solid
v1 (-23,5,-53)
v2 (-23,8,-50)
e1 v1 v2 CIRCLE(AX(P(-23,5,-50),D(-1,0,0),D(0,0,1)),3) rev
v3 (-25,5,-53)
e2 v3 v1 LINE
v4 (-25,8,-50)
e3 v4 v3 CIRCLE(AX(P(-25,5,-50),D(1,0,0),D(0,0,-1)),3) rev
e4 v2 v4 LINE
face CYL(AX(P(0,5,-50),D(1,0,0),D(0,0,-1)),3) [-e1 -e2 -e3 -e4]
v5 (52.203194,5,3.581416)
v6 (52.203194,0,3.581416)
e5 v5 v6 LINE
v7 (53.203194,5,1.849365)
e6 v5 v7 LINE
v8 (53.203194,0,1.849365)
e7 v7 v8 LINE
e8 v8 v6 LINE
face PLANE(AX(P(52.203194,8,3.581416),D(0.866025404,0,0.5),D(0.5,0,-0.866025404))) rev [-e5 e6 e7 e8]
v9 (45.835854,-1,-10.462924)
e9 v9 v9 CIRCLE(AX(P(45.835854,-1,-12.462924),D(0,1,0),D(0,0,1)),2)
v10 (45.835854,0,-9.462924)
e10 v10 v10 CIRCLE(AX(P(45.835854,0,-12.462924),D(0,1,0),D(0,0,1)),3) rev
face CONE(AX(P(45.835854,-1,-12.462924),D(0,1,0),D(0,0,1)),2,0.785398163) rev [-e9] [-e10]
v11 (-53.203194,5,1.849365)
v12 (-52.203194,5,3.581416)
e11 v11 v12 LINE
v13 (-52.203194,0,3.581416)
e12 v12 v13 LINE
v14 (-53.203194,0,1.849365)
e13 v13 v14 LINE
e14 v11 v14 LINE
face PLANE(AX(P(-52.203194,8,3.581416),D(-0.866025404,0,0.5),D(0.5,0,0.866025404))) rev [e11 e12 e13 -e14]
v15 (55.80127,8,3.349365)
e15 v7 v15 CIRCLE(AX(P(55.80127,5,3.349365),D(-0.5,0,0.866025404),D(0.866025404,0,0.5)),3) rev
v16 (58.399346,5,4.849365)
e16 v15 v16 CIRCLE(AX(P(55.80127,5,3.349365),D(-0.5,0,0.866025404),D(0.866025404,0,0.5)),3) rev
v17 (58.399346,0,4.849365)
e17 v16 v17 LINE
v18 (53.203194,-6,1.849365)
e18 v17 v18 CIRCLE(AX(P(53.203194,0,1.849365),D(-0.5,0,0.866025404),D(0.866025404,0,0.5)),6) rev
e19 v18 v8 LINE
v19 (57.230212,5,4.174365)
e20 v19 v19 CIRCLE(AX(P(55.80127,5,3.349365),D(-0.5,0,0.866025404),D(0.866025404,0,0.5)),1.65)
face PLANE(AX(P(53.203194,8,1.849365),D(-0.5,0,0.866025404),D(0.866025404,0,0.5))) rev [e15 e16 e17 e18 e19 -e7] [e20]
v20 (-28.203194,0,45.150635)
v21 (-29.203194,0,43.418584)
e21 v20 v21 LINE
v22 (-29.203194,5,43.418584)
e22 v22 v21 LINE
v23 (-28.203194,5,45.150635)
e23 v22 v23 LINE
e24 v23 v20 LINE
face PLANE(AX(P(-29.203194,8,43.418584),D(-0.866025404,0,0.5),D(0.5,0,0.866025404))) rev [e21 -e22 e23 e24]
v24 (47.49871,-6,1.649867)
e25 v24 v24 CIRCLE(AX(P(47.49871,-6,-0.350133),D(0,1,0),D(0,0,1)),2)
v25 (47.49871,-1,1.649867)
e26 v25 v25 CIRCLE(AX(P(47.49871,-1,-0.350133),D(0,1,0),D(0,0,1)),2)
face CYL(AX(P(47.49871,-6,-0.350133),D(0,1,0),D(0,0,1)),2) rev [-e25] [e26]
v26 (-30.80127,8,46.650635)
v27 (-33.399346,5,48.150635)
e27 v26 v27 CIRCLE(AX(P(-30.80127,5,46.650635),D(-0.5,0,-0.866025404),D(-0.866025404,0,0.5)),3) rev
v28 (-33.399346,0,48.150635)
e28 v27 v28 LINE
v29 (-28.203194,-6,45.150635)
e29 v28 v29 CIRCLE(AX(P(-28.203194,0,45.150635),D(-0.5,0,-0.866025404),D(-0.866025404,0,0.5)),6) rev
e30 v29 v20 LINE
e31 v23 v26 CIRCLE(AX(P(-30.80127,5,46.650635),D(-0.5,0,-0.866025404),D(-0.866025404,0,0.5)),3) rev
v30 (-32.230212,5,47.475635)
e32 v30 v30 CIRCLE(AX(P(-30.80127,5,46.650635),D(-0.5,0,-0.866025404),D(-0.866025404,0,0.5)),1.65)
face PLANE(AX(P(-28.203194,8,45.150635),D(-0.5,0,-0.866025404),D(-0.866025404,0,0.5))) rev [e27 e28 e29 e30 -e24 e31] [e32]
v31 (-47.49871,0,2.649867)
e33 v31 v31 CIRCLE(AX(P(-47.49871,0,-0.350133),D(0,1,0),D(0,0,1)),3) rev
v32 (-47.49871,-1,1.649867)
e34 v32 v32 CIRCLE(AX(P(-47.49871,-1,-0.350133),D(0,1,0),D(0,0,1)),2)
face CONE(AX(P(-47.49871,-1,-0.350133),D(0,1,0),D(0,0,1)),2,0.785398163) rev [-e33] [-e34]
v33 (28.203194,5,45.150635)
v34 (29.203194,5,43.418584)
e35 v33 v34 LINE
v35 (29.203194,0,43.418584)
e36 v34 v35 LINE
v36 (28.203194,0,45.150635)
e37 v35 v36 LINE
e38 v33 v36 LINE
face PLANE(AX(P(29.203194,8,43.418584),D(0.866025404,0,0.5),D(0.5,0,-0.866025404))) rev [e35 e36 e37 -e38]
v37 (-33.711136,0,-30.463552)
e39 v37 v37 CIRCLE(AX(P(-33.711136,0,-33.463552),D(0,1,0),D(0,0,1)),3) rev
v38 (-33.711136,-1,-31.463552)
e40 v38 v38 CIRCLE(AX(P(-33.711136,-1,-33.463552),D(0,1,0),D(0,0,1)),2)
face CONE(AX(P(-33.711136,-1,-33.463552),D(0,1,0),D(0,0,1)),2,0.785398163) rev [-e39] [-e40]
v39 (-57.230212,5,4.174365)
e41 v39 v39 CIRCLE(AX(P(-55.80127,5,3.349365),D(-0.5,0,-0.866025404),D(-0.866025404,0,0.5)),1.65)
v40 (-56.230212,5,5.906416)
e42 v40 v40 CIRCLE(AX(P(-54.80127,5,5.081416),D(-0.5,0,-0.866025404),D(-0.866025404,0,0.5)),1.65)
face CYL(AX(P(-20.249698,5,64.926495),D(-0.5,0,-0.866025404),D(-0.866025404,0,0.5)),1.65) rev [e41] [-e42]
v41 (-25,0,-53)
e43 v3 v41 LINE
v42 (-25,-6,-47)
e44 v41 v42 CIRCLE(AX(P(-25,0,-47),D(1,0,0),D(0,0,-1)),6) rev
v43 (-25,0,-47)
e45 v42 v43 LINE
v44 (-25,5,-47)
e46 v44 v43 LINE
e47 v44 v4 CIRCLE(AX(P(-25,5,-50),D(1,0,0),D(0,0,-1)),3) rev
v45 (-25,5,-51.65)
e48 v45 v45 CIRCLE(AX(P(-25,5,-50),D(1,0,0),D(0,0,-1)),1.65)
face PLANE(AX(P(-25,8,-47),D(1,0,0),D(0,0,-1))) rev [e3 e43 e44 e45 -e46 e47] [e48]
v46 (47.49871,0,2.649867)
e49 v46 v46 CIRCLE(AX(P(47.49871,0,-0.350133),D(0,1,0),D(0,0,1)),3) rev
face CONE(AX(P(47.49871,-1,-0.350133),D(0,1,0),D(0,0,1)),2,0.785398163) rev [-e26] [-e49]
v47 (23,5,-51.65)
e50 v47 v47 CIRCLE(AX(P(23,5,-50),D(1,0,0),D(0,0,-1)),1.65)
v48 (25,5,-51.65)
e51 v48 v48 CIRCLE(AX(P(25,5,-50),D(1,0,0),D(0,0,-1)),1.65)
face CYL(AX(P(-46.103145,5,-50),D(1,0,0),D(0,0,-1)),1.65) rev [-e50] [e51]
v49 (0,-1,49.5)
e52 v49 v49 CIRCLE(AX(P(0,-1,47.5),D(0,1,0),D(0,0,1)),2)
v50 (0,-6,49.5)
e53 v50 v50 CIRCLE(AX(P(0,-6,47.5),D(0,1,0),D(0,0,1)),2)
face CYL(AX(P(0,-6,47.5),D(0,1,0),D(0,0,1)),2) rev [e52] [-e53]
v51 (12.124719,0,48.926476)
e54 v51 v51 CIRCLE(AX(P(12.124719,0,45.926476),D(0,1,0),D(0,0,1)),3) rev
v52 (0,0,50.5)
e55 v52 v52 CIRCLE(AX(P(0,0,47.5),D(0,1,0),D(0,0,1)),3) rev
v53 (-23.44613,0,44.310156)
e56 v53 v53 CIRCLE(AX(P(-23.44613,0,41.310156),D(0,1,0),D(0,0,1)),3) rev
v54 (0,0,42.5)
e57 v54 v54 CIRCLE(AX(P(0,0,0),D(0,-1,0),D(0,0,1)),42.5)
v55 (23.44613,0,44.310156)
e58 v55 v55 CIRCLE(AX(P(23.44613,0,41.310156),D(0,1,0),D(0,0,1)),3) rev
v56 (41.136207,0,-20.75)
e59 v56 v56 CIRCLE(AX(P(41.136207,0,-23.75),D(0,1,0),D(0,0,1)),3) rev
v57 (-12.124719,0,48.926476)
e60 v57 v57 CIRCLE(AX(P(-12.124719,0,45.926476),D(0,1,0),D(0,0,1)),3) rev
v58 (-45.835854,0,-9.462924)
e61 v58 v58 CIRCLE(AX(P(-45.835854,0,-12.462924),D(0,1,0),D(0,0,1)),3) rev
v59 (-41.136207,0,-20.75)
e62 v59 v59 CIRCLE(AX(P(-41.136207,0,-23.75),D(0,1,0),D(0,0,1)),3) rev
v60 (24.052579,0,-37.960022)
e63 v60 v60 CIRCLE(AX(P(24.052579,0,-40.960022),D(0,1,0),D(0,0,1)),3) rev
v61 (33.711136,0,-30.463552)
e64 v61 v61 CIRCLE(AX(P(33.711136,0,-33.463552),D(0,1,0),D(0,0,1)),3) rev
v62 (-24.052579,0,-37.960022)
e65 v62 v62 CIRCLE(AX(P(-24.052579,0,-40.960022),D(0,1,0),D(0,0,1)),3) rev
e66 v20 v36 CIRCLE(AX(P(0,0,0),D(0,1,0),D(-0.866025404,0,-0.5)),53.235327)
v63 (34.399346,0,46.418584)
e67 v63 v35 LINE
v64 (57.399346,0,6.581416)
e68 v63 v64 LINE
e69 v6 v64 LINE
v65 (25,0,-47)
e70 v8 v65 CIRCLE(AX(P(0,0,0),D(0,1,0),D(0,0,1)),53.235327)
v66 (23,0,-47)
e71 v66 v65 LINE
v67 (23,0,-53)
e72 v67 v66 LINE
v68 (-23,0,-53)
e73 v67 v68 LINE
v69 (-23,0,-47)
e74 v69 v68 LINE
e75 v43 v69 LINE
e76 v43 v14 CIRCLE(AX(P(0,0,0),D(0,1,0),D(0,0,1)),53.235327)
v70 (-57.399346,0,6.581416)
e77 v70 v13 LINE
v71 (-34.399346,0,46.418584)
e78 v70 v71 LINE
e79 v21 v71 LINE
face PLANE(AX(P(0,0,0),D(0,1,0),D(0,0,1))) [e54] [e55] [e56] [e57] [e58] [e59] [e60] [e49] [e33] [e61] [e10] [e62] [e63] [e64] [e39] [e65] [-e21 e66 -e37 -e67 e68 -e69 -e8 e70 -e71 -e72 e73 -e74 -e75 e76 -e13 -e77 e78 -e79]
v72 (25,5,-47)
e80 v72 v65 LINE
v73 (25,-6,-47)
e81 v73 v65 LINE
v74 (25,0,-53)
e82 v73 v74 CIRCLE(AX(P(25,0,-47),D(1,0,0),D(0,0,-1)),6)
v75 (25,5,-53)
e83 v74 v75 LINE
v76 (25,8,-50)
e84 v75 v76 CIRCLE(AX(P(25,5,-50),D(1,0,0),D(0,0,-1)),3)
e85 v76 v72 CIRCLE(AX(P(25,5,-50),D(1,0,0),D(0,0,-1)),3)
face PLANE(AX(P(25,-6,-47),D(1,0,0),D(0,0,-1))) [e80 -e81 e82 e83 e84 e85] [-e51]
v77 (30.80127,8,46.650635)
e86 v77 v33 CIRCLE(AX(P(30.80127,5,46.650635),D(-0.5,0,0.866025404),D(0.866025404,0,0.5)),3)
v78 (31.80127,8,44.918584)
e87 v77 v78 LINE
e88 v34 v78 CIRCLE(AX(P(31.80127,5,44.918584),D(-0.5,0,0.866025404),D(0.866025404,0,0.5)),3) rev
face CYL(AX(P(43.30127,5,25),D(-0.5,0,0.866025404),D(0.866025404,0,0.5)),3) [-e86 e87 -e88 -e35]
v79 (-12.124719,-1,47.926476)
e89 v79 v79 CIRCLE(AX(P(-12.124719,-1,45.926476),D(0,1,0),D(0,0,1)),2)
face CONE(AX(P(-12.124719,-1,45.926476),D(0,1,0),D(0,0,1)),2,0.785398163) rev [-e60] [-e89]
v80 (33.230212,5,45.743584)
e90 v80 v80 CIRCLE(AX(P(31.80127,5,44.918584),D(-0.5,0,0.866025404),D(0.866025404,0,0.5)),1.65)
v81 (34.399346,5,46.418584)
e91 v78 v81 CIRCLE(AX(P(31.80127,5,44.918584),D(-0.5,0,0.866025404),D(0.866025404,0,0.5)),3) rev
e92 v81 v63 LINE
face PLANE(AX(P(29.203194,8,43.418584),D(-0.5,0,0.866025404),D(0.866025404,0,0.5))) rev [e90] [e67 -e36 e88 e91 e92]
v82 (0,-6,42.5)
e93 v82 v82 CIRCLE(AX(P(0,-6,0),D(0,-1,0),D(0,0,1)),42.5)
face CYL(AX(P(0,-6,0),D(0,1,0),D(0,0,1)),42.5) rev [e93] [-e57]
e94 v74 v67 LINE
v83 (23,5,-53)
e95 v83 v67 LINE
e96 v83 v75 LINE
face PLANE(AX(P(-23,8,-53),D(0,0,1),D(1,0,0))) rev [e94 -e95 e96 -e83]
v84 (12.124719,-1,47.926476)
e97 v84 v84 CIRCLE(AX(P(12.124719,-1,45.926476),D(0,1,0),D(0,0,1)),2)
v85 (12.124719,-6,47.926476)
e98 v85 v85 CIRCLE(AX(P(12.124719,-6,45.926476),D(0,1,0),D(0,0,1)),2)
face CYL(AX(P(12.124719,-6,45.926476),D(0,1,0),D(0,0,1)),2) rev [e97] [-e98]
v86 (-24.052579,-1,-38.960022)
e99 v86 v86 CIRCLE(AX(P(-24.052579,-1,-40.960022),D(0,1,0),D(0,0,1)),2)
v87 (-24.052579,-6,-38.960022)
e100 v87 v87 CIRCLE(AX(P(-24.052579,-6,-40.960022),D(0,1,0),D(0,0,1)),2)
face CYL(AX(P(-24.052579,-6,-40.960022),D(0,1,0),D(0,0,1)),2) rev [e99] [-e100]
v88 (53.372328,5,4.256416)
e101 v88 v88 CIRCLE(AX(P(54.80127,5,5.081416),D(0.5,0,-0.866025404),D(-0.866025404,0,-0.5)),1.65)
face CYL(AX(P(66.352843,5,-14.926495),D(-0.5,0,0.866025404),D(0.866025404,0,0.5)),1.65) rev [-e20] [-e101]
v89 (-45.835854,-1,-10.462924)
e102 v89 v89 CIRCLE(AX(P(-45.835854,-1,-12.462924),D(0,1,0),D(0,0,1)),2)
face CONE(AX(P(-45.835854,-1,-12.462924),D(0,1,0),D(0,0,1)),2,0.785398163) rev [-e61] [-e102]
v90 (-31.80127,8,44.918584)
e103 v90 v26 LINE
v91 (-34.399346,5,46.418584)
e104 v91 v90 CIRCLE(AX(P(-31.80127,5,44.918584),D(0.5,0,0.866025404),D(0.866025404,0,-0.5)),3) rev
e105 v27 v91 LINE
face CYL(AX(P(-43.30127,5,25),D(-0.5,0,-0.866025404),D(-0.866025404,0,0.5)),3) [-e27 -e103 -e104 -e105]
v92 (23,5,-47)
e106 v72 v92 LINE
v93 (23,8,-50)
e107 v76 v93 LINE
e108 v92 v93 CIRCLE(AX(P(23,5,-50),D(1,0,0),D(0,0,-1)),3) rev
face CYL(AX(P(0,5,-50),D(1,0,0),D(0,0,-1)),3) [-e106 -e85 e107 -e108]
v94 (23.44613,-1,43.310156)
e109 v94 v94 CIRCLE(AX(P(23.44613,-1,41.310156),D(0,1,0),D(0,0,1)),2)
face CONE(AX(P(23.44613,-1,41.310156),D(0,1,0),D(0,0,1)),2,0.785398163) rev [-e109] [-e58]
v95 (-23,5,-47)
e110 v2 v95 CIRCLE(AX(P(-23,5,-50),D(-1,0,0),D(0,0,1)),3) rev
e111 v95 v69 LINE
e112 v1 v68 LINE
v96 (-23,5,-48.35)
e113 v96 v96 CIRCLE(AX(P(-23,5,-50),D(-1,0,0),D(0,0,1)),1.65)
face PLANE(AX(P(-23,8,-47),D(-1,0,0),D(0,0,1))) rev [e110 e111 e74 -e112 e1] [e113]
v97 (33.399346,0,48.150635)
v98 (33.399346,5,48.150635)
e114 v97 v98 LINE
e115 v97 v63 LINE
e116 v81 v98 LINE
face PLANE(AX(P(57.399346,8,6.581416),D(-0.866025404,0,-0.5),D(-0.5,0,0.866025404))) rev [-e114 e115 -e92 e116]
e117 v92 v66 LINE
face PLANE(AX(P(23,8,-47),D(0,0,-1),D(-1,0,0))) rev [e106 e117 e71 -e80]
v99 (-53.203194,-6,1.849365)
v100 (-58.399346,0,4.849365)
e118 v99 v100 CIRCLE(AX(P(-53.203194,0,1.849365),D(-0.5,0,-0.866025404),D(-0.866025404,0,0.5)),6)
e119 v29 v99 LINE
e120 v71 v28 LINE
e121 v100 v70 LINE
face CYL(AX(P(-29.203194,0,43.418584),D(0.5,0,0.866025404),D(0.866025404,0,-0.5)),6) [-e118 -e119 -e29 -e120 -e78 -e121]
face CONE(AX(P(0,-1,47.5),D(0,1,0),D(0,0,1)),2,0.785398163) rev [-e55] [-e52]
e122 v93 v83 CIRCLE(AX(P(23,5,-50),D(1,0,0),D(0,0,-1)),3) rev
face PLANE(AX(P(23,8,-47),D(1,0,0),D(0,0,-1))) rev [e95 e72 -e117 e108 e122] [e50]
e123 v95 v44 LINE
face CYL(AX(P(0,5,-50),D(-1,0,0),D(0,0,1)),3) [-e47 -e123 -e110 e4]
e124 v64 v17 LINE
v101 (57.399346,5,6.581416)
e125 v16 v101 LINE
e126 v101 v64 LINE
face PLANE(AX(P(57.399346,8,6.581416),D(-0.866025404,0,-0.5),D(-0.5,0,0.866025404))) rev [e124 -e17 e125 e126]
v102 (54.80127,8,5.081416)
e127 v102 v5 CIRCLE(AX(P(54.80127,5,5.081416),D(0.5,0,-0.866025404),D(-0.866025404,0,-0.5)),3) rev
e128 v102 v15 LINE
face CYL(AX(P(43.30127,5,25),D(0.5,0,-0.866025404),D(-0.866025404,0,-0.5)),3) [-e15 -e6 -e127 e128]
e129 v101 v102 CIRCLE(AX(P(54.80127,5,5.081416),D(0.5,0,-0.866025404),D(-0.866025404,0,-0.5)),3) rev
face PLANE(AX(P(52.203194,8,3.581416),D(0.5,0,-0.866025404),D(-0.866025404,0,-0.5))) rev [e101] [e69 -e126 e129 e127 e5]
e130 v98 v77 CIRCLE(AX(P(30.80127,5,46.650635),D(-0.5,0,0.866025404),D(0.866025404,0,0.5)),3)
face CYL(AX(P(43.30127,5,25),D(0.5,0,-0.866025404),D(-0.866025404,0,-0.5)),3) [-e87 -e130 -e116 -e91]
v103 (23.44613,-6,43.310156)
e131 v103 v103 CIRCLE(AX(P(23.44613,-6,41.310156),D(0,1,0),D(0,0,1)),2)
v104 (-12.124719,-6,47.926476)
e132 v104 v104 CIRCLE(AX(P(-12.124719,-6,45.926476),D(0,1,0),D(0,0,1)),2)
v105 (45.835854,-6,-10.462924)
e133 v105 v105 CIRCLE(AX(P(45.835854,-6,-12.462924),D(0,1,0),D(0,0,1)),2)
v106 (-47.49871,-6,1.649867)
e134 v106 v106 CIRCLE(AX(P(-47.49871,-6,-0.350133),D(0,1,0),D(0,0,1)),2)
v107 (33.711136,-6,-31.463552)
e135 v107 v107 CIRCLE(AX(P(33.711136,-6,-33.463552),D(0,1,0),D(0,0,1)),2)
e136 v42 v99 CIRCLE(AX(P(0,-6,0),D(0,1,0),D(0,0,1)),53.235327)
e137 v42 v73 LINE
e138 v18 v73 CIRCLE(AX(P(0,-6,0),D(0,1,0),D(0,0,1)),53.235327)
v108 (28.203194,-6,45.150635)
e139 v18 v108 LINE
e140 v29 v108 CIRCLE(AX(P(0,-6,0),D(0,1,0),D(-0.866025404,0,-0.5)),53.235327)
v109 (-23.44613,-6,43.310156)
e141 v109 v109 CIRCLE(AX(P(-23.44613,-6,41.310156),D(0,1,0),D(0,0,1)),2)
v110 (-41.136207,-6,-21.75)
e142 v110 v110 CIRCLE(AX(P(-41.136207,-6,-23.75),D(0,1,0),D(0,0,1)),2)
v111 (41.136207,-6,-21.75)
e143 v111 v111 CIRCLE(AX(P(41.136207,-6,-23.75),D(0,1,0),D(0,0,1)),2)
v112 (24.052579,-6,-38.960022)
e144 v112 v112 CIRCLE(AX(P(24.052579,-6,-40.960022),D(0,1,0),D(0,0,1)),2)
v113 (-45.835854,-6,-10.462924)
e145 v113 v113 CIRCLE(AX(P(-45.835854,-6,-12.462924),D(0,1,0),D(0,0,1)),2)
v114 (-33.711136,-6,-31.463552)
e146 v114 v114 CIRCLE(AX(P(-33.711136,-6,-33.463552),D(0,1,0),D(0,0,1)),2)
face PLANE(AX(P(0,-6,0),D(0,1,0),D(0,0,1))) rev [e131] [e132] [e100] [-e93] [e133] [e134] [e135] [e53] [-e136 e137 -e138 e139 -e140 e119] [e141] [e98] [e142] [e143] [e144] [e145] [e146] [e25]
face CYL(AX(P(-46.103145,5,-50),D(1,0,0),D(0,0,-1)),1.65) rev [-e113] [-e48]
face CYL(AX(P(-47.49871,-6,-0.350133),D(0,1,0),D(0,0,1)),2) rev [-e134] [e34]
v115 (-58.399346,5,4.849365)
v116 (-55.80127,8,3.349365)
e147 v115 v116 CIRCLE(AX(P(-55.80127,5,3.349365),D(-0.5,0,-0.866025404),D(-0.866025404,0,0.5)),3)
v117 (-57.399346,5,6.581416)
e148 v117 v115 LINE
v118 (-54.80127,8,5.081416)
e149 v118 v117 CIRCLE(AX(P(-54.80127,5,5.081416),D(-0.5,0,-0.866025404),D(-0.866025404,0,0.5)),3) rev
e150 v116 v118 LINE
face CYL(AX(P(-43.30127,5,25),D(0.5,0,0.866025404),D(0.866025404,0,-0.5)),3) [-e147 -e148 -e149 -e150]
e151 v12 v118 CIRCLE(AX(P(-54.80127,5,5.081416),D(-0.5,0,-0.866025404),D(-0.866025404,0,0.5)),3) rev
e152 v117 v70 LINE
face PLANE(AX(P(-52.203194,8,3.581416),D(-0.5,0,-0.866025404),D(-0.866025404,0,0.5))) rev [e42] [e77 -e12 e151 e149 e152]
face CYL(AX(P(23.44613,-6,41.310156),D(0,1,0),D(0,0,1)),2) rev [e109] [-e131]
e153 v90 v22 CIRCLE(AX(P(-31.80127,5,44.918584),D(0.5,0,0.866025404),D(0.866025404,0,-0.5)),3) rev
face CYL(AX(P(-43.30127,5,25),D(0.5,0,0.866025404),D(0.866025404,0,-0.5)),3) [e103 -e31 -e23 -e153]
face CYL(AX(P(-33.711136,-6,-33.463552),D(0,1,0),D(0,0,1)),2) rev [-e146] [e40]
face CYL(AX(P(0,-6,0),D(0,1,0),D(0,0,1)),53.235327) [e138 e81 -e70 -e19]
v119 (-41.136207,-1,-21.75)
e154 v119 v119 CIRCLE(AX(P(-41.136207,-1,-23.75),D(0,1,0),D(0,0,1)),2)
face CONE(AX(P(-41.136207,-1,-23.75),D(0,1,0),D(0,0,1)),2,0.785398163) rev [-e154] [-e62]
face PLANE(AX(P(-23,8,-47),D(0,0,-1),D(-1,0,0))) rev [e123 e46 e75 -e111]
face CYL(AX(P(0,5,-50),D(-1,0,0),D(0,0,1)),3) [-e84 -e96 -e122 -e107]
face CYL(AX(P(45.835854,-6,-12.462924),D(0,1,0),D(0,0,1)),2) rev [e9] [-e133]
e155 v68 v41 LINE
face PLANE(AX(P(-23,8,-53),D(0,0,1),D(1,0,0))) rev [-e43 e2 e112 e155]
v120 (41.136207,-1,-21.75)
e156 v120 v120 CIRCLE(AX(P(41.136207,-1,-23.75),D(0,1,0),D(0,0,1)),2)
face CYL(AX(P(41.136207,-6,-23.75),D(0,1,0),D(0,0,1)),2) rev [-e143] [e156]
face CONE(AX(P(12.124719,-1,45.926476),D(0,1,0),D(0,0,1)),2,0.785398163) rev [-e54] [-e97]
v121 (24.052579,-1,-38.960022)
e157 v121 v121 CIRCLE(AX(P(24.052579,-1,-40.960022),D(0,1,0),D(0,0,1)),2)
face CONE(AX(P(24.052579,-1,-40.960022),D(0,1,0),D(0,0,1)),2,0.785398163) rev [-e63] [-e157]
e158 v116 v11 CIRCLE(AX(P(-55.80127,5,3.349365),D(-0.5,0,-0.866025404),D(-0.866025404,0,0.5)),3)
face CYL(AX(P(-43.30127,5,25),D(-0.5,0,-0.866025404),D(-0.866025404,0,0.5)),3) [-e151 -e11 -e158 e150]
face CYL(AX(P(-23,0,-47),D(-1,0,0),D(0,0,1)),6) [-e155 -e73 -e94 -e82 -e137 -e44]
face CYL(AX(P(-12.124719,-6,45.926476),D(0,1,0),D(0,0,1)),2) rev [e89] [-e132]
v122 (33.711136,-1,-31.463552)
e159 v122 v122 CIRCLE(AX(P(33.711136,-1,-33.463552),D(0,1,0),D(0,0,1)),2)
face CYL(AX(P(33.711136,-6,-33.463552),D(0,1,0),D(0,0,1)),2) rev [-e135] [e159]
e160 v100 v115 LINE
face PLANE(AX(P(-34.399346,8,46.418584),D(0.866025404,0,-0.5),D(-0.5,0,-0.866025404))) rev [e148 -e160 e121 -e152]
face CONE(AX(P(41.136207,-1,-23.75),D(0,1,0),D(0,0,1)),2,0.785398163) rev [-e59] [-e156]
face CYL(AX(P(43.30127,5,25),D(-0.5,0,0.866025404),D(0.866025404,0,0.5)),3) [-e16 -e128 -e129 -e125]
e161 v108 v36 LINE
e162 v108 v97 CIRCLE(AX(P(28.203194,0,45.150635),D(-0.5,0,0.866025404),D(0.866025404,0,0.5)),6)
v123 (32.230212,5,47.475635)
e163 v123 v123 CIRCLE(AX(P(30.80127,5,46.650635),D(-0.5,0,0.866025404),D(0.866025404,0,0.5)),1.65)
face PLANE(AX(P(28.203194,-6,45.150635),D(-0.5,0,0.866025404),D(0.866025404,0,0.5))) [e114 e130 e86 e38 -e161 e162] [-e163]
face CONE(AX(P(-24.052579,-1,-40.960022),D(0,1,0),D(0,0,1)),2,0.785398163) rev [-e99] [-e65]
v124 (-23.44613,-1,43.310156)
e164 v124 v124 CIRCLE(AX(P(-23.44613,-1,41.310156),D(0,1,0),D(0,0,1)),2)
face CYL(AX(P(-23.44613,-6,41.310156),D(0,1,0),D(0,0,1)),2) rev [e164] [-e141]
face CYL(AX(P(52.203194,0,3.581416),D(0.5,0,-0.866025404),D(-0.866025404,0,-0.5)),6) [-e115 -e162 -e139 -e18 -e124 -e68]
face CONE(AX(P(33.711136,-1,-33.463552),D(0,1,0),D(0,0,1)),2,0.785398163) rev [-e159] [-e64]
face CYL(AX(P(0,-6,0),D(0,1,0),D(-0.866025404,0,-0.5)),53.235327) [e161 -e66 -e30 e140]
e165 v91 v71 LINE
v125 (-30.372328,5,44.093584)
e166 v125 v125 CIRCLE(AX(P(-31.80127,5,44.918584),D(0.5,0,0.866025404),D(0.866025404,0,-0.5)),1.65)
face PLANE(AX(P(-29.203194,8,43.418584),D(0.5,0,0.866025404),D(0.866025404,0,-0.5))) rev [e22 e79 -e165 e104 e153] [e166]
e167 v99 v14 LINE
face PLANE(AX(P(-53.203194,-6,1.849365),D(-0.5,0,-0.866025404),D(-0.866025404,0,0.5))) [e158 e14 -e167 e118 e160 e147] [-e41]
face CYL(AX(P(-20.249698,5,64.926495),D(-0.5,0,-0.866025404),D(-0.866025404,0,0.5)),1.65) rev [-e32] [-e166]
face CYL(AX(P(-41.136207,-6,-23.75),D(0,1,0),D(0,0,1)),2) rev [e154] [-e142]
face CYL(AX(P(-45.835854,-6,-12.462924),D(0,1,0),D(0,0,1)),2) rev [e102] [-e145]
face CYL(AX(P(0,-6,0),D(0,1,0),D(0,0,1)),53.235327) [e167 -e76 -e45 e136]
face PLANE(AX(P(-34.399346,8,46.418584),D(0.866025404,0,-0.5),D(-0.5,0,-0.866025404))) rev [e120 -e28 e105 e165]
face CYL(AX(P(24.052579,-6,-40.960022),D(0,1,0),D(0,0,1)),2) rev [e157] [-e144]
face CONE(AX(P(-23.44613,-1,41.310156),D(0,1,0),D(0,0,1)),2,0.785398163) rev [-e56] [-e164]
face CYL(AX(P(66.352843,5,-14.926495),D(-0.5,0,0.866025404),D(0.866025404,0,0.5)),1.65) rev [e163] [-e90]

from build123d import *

# Parameters (mm, degrees)
SKETCH1_W                = 2
SKETCH1_H                = 6
BOSS_EXTRUDE1_DEPTH      = 8
BOSS_EXTRUDE1_2_DEPTH    = 8
BOSS_EXTRUDE2_DEPTH      = 6
FILLET2_R                = 3
SKETCH3_R                = 1.65
CUT_EXTRUDE1_DEPTH       = 90.043007931
FILLET3_R                = 6
CIRPATTERN2_COUNT        = 3
FILLET2_OF_CIRPATTERN2_R = 3
FILLET3_OF_CIRPATTERN2_R = 6
SKETCH4_R                = 2
CUT_EXTRUDE2_DEPTH       = 80.425963387
CHAMFER1_SIZE            = 1


with BuildPart() as part:
    # Sketch1 → Boss-Extrude1 (new body)
    with BuildSketch(Plane(origin=(0, 0, 0), x_dir=(1, 0, 0), z_dir=(0, 1, 0))):
        with Locations((-24, 50)):
            Rectangle(SKETCH1_W, SKETCH1_H)
    boss_extrude1 = extrude(amount=BOSS_EXTRUDE1_DEPTH)



with BuildPart() as body_2:
    # Sketch1 → Boss-Extrude1 2 (new body)
    with BuildSketch(Plane(origin=(0, 0, 0), x_dir=(1, 0, 0), z_dir=(0, 1, 0))):
        with Locations((24, 50)):
            Rectangle(SKETCH1_W, SKETCH1_H)
    boss_extrude1_2 = extrude(amount=BOSS_EXTRUDE1_2_DEPTH)


with BuildPart() as part_1:
    add(part.part)

    add(body_2.part)  # Boss-Extrude2 merges body 2
    # Sketch2 → Boss-Extrude2 (add)
    with BuildSketch(Plane(origin=(0, 0, 0), x_dir=(1, 0, 0), z_dir=(0, 1, 0))):
        with BuildLine():
            Line((25, 53), (-25, 53))
            Line((-25, 53), (-25, 47))
            ThreePointArc((-25, 47), (-36.983431799, 38.291327639), (-46.103145229, 26.617663308))
            Line((-46.103145229, 26.617663308), (-36.806079661, 21.25))
            ThreePointArc((-36.806079661, 21.25), (0, 42.5), (36.806079661, 21.25))
            Line((36.806079661, 21.25), (46.103145229, 26.617663308))
            ThreePointArc((46.103145229, 26.617663308), (36.983431799, 38.291327639), (25, 47))
            Line((25, 47), (25, 53))
        make_face()
    boss_extrude2 = extrude(amount=-BOSS_EXTRUDE2_DEPTH)

    # Fillet2
    fillet2_edges = [part_1.edges().sort_by_distance(p)[0] for p in [
        (24, 8, -47),
        (24, 8, -53),
        (-24, 8, -47),
        (-24, 8, -53),
    ]]
    fillet(fillet2_edges, radius=FILLET2_R - 0.0001)  # a hair under: the kernel refuses the full size

    # Sketch3 → Cut-Extrude1 (cut, through all)
    with BuildSketch(Plane(origin=(25, 0, 0), x_dir=(0, 0, -1), z_dir=(1, 0, 0))):
        with Locations((50, 5)):
            Circle(SKETCH3_R)
    cut_extrude1 = extrude(amount=-CUT_EXTRUDE1_DEPTH, mode=Mode.SUBTRACT)

    # Fillet3
    fillet3_edges = [part_1.edges().sort_by_distance(p)[0] for p in [
        (0, -6, -53),
    ]]
    fillet(fillet3_edges, radius=FILLET3_R - 0.0001)  # a hair under: the kernel refuses the full size

    # CirPattern2: Boss-Extrude1, Boss-Extrude1 2, Boss-Extrude2, Cut-Extrude1 ×3 about axis
    cirpattern2_axis = Axis((0, 0, 0), (0, 1, 0))
    add([boss_extrude1.rotate(cirpattern2_axis, i * 360 / CIRPATTERN2_COUNT) for i in range(1, CIRPATTERN2_COUNT)])
    add([boss_extrude1_2.rotate(cirpattern2_axis, i * 360 / CIRPATTERN2_COUNT) for i in range(1, CIRPATTERN2_COUNT)])
    add([boss_extrude2.rotate(cirpattern2_axis, i * 360 / CIRPATTERN2_COUNT) for i in range(1, CIRPATTERN2_COUNT)])
    add([cut_extrude1.rotate(cirpattern2_axis, i * 360 / CIRPATTERN2_COUNT) for i in range(1, CIRPATTERN2_COUNT)], mode=Mode.SUBTRACT)

    # Fillet2 of CirPattern2
    fillet2_of_cirpattern2_edges = [part_1.edges().sort_by_distance(p)[0] for p in [
        (-52.703193978, 8, 2.715390309),
        (-57.899346401, 8, 5.715390309),
        (-28.703193978, 8, 44.284609691),
        (-33.899346401, 8, 47.284609691),
        (28.703193978, 8, 44.284609691),
        (33.899346401, 8, 47.284609691),
        (52.703193978, 8, 2.715390309),
        (57.899346401, 8, 5.715390309),
    ]]
    fillet(fillet2_of_cirpattern2_edges, radius=FILLET2_OF_CIRPATTERN2_R - 0.0001)  # a hair under: the kernel refuses the full size

    # Fillet3 of CirPattern2
    fillet3_of_cirpattern2_edges = [part_1.edges().sort_by_distance(p)[0] for p in [
        (-45.899346401, -6, 26.5),
        (45.899346401, -6, 26.5),
    ]]
    fillet(fillet3_of_cirpattern2_edges, radius=FILLET3_OF_CIRPATTERN2_R - 0.0001)  # a hair under: the kernel refuses the full size

    # Sketch4 → Cut-Extrude2 (cut, through all)
    with BuildSketch(Plane(origin=(0, 0, 0), x_dir=(1, 0, 0), z_dir=(0, 1, 0))):
        with Locations(Location((-41.13620668, 23.75, 0), (0, 0, 270))):
            Circle(SKETCH4_R)
        with Locations(Location((-24.052579046, 40.960022476, 0), (0, 0, 270))):
            Circle(SKETCH4_R)
        with Locations(Location((-47.498709527, 0.350133242, 0), (0, 0, 270))):
            Circle(SKETCH4_R)
        with Locations(Location((-33.711135616, 33.463552344, 0), (0, 0, 270))):
            Circle(SKETCH4_R)
        with Locations(Location((-45.835854239, 12.462923661, 0), (0, 0, 270))):
            Circle(SKETCH4_R)
        with Locations(Location((47.498709527, 0.350133242, 0), (0, 0, 270))):
            Circle(SKETCH4_R)
        with Locations(Location((45.835854239, 12.462923661, 0), (0, 0, 270))):
            Circle(SKETCH4_R)
        with Locations(Location((41.13620668, 23.75, 0), (0, 0, 270))):
            Circle(SKETCH4_R)
        with Locations(Location((33.711135616, 33.463552344, 0), (0, 0, 270))):
            Circle(SKETCH4_R)
        with Locations(Location((24.052579046, 40.960022476, 0), (0, 0, 270))):
            Circle(SKETCH4_R)
        with Locations(Location((-23.446130481, -41.310155718, 0), (0, 0, 270))):
            Circle(SKETCH4_R)
        with Locations(Location((-12.124718623, -45.926476006, 0), (0, 0, 270))):
            Circle(SKETCH4_R)
        with Locations(Location((0, -47.5, 0), (0, 0, 270))):
            Circle(SKETCH4_R)
        with Locations(Location((12.124718623, -45.926476006, 0), (0, 0, 270))):
            Circle(SKETCH4_R)
        with Locations(Location((23.446130481, -41.310155718, 0), (0, 0, 270))):
            Circle(SKETCH4_R)
    extrude(amount=-CUT_EXTRUDE2_DEPTH, mode=Mode.SUBTRACT)

    # Chamfer1
    chamfer1_edges = [part_1.edges().sort_by_distance(p)[0] for p in [
        (-41.13620668, 0, -25.75),
        (-24.052579046, 0, -42.960022476),
        (-47.498709527, 0, -2.350133242),
        (-33.711135616, 0, -35.463552344),
        (-45.835854239, 0, -14.462923661),
        (41.13620668, 0, -25.75),
        (47.498709527, 0, -2.350133242),
        (24.052579046, 0, -42.960022476),
        (45.835854239, 0, -14.462923661),
        (33.711135616, 0, -35.463552344),
        (0, 0, 45.5),
        (-23.446130481, 0, 39.310155718),
        (23.446130481, 0, 39.310155718),
        (-12.124718623, 0, 43.926476006),
        (12.124718623, 0, 43.926476006),
    ]]
    chamfer(chamfer1_edges, length=CHAMFER1_SIZE)


solid = part_1.part
